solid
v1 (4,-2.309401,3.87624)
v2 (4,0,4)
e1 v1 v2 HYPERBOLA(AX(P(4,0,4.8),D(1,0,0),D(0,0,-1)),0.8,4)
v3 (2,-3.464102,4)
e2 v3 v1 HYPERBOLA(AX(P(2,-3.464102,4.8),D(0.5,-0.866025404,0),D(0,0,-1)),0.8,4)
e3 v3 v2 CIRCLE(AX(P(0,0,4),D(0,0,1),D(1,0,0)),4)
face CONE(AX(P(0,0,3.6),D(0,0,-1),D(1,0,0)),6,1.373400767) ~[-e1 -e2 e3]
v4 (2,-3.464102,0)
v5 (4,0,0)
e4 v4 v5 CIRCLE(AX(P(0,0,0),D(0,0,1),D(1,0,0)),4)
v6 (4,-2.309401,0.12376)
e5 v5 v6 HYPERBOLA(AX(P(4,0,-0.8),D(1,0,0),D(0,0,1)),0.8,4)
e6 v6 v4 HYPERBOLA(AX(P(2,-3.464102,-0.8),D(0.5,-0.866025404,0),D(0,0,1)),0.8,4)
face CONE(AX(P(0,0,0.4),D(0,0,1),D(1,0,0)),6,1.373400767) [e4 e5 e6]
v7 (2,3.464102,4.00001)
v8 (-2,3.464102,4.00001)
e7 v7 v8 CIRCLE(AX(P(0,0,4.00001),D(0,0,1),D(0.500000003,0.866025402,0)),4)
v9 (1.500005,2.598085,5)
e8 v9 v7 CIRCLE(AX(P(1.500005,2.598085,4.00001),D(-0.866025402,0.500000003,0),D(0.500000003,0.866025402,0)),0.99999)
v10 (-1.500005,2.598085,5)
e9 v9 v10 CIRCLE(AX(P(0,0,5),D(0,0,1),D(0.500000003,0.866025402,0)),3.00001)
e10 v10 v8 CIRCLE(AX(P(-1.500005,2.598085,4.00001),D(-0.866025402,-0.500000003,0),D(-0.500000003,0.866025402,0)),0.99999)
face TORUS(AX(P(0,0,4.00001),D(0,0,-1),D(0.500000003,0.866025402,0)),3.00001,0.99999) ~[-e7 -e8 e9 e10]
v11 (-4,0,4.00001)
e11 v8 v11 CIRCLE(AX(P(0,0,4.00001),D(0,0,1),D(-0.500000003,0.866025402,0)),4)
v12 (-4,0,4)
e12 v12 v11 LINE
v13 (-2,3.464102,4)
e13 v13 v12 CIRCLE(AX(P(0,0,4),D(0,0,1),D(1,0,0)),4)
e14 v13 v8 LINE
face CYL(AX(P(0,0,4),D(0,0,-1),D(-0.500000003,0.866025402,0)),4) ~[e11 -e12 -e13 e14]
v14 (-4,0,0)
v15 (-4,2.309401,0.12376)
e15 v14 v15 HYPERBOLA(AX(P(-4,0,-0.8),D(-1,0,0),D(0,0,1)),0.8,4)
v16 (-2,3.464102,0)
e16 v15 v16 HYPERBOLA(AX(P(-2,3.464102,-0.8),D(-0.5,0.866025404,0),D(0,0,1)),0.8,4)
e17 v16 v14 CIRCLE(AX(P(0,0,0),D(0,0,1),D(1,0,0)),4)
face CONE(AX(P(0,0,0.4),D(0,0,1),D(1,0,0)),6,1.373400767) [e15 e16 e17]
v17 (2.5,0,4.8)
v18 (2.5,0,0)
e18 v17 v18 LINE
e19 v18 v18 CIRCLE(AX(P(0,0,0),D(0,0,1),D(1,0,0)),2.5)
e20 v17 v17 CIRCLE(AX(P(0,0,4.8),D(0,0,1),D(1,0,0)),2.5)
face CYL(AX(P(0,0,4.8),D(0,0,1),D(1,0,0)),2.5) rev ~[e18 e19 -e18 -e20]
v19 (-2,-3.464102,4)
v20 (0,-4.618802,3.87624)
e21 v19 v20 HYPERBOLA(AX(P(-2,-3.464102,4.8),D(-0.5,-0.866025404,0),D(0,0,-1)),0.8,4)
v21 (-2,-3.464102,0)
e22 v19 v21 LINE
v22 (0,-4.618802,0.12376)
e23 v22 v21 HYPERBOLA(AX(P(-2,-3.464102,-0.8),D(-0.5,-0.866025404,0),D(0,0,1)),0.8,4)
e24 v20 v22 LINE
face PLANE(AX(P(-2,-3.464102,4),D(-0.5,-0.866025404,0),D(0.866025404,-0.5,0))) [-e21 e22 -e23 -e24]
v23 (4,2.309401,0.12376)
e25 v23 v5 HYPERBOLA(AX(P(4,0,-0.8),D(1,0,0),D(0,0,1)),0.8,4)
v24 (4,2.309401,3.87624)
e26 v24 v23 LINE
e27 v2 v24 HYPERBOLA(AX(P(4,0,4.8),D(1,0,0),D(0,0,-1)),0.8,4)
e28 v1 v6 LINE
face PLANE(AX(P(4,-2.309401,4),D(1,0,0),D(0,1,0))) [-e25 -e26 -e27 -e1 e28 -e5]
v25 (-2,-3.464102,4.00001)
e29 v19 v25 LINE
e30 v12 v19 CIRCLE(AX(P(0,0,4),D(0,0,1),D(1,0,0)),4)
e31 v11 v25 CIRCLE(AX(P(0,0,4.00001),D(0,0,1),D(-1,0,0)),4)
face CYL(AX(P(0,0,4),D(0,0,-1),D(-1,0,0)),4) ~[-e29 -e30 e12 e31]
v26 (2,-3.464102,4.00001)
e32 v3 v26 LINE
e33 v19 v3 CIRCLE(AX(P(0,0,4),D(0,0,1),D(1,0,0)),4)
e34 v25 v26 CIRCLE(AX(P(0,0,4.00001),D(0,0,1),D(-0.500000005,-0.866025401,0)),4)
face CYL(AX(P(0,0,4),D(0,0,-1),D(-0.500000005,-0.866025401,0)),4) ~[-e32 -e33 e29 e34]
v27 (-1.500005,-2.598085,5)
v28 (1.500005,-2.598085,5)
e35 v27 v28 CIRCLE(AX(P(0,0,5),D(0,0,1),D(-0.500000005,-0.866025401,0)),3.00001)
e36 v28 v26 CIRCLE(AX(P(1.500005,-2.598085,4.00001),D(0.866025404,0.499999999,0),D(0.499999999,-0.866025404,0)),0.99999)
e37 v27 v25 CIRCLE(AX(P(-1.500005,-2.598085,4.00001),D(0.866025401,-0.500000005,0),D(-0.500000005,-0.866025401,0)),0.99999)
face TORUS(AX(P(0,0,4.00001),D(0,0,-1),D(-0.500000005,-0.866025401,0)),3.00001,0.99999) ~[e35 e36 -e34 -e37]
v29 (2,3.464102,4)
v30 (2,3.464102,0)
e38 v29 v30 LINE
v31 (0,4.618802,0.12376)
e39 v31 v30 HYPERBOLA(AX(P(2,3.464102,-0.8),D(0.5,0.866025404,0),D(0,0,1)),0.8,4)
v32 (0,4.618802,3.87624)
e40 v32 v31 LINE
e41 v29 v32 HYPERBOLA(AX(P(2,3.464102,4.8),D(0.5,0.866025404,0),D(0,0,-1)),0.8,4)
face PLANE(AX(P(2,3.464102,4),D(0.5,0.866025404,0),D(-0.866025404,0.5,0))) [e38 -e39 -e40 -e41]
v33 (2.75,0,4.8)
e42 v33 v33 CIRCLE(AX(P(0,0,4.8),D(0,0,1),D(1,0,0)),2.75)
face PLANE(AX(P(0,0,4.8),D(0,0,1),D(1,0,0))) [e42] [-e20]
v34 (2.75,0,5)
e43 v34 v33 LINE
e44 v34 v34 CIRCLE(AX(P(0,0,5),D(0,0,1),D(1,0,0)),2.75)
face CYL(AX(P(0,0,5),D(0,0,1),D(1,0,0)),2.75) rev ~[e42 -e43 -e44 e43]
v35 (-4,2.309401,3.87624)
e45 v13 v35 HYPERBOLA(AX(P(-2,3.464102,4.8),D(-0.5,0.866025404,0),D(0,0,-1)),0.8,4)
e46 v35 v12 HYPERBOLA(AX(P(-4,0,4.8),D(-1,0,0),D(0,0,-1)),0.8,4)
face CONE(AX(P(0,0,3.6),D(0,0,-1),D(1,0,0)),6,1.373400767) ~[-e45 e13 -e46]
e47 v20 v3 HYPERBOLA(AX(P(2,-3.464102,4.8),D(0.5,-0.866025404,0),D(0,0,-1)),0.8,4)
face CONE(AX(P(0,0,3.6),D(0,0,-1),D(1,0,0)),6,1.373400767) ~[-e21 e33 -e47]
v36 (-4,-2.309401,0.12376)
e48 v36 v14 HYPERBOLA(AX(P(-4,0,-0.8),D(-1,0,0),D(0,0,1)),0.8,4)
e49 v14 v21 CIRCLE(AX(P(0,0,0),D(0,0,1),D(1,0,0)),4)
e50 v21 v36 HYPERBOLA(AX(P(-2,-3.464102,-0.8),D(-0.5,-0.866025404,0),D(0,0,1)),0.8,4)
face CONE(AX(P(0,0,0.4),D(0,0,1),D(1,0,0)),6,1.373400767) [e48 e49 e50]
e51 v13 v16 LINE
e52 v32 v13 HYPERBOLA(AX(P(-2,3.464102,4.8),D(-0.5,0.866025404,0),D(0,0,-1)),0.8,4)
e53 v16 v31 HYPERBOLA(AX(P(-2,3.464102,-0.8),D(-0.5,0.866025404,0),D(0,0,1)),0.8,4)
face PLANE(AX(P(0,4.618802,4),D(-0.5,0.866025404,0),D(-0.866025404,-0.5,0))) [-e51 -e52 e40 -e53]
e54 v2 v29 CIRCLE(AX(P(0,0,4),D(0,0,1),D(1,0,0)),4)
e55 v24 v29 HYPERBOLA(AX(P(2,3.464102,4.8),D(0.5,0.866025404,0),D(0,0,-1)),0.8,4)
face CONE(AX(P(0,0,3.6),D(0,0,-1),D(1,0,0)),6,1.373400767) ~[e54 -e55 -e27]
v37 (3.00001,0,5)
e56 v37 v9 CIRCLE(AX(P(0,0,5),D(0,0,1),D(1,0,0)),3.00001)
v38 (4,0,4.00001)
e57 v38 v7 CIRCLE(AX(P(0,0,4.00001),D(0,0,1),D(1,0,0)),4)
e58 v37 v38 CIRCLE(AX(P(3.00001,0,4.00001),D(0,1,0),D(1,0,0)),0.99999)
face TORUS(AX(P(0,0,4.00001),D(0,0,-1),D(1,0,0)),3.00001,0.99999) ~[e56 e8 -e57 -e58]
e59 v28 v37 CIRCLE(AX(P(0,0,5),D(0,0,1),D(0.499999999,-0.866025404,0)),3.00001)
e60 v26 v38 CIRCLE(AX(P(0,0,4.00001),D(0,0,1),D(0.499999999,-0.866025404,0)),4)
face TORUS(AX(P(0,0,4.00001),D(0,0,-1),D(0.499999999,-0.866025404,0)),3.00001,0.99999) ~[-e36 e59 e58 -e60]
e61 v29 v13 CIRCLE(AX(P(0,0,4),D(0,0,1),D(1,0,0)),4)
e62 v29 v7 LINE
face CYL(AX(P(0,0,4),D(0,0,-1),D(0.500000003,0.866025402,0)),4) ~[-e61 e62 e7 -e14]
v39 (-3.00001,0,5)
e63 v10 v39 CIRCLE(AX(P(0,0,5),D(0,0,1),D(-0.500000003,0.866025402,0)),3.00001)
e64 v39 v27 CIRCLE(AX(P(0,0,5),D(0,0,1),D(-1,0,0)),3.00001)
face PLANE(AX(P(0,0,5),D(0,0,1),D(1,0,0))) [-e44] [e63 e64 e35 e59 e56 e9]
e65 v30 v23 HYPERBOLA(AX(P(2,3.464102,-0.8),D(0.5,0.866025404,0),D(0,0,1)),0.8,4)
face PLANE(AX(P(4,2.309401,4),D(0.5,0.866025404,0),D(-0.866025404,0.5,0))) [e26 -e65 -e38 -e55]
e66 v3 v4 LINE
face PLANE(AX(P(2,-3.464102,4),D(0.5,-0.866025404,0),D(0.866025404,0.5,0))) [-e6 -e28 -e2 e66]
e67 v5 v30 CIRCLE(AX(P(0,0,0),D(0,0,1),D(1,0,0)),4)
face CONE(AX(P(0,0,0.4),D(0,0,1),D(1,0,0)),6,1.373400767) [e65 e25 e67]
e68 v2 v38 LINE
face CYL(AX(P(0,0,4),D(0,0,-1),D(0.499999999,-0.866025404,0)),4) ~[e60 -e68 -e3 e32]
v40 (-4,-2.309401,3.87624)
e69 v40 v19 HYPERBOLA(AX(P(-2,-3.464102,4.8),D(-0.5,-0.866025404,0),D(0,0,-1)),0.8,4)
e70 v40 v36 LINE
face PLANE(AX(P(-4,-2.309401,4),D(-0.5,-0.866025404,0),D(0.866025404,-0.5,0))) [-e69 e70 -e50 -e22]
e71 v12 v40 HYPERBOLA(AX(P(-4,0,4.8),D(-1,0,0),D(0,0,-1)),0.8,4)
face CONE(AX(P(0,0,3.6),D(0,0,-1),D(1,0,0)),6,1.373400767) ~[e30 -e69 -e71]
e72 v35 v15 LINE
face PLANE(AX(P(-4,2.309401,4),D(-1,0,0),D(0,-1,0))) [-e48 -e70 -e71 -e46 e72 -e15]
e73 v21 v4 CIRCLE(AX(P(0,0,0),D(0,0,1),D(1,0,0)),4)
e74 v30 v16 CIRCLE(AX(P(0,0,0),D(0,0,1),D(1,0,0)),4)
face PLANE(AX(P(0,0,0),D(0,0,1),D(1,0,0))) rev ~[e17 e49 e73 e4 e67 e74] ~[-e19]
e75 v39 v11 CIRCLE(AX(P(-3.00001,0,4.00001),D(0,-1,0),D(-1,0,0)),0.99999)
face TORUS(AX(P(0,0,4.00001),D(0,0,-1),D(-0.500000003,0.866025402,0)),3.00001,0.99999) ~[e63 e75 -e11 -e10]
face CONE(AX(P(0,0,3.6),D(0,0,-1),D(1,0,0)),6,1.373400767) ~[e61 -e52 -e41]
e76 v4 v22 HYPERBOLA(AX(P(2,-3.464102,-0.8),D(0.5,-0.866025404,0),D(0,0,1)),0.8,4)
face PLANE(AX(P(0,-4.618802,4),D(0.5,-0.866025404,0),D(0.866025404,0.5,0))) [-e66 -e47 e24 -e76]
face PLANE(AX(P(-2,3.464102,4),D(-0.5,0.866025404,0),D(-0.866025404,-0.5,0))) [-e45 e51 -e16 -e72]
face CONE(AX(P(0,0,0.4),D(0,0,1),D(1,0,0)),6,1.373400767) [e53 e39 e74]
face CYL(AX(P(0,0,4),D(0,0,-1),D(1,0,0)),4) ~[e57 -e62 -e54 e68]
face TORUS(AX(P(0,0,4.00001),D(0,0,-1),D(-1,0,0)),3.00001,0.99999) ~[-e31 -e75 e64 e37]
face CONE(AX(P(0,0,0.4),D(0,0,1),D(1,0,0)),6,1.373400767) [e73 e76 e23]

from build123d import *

# Parameters (mm, degrees)
F0_R       = 6
F1_DEPTH   = 4
F2_SIZE2   = 0.4
F2_SIZE    = 2
F2_2_SIZE2 = 0.4
F2_2_SIZE  = 2
F4_DEPTH   = 25
F6_DEPTH   = 1
F7_R       = 0.99999
F8_R       = 2.75
F9_DEPTH   = 0.2
F10_R      = 2.5
F11_DEPTH  = 25


# Not quite as in the source:
# - a fillet or chamfer is up to 0.001 mm smaller than in the source, because OpenCascade refuses the exact size


with BuildPart() as f1:
    # F0 (on Top) → F1 (new body)
    with BuildSketch(Plane.XY):
        Circle(F0_R)
    extrude(amount=F1_DEPTH)

    # F2
    f2_edges = [f1.edges().sort_by_distance(p)[0] for p in [
        (-6, 0, 4),
    ]]
    f2_side = f1.faces().sort_by_distance((0, 0, 4))[0]
    chamfer(f2_edges, length=F2_SIZE, length2=F2_SIZE2, reference=f2_side)

    # F2#2
    f2_2_edges = [f1.edges().sort_by_distance(p)[0] for p in [
        (-6, 0, 0),
    ]]
    f2_2_side = f1.faces().sort_by_distance((0, 0, 0))[0]
    chamfer(f2_2_edges, length=F2_2_SIZE, length2=F2_2_SIZE2, reference=f2_2_side)

    # F3 (on face) → F4 (intersect)
    with BuildSketch(Plane.XY.offset(4)):
        with BuildLine():
            Line((-4, -2.3094010768), (-1.9999999977, -3.4641016165))
            ThreePointArc((-1.9999999977, -3.4641016165), (-3.4641016145, -2.0000000012), (-4, 0))
            Line((-4, 0), (-4, -2.3094010768))
        make_face()
        with BuildLine():
            ThreePointArc((-4, 0), (-3.4641016358, 1.9999999642), (-2.0000000715, 3.4641015738))
            Line((-2.0000000715, 3.4641015738), (-4, 2.3094010768))
            Line((-4, 2.3094010768), (-4, 0))
        make_face()
        with BuildLine():
            ThreePointArc((-2.0000000715, 3.4641015738), (-2.18e-08, 4), (2.0000000338, 3.4641015956))
            Line((2.0000000338, 3.4641015956), (0, 4.6188021535))
            Line((0, 4.6188021535), (-2.0000000715, 3.4641015738))
        make_face()
        with BuildLine():
            Line((4, 0), (4, 2.3094010768))
            Line((4, 2.3094010768), (2.0000000338, 3.4641015956))
            ThreePointArc((2.0000000338, 3.4641015956), (3.4641016249, 1.9999999831), (4, 0))
        make_face()
        with BuildLine():
            Line((4, -2.3094010768), (4, 0))
            ThreePointArc((4, 0), (3.4641016169, -1.9999999969), (2.0000000062, -3.4641016116))
            Line((2.0000000062, -3.4641016116), (4, -2.3094010768))
        make_face()
        with BuildLine():
            Line((0, -4.6188021535), (2.0000000062, -3.4641016116))
            ThreePointArc((2.0000000062, -3.4641016116), (4.9e-09, -4), (-1.9999999977, -3.4641016165))
            Line((-1.9999999977, -3.4641016165), (0, -4.6188021535))
        make_face()
        with BuildLine():
            ThreePointArc((2.0000000062, -3.4641016116), (3.4641016169, -1.9999999969), (4, 0))
            ThreePointArc((4, 0), (3.4641016249, 1.9999999831), (2.0000000338, 3.4641015956))
            ThreePointArc((2.0000000338, 3.4641015956), (-2.18e-08, 4), (-2.0000000715, 3.4641015738))
            ThreePointArc((-2.0000000715, 3.4641015738), (-3.4641016358, 1.9999999642), (-4, 0))
            ThreePointArc((-4, 0), (-3.4641016145, -2.0000000012), (-1.9999999977, -3.4641016165))
            ThreePointArc((-1.9999999977, -3.4641016165), (4.9e-09, -4), (2.0000000062, -3.4641016116))
        make_face()
    extrude(amount=-F4_DEPTH, mode=Mode.INTERSECT)

    # F5 (on face) → F6 (join)
    with BuildSketch(Plane.XY.offset(4)):
        with BuildLine():
            ThreePointArc((1.9999999952, -3.4641016179), (3.4641016138, -2.0000000024), (4, 0))
            ThreePointArc((4, 0), (3.4641016188, 1.9999999936), (2.0000000128, 3.4641016077))
            ThreePointArc((2.0000000128, 3.4641016077), (0, 4), (-2.0000000128, 3.4641016077))
            ThreePointArc((-2.0000000128, 3.4641016077), (-3.4641016188, 1.9999999936), (-4, 0))
            ThreePointArc((-4, 0), (-3.4641016204, -1.9999999909), (-2.0000000181, -3.4641016047))
            ThreePointArc((-2.0000000181, -3.4641016047), (-1.32e-08, -4), (1.9999999952, -3.4641016179))
        make_face()
    extrude(amount=F6_DEPTH)

    # F7 (radius 1 in the source; OpenCascade refuses exactly that, so slightly less here)
    f7_edges = [f1.edges().sort_by_distance(p)[0] for p in [
        (-4, 0, 5),
    ]]
    fillet(f7_edges, radius=F7_R)

    # F8 (on face) → F9 (cut)
    with BuildSketch(Plane.XY.offset(5)):
        Circle(F8_R)
    extrude(amount=-F9_DEPTH, mode=Mode.SUBTRACT)

    # F10 (on face) → F11 (cut)
    with BuildSketch(Plane.XY.offset(4.8)):
        Circle(F10_R)
    extrude(amount=-F11_DEPTH, mode=Mode.SUBTRACT)


solid = f1.part
